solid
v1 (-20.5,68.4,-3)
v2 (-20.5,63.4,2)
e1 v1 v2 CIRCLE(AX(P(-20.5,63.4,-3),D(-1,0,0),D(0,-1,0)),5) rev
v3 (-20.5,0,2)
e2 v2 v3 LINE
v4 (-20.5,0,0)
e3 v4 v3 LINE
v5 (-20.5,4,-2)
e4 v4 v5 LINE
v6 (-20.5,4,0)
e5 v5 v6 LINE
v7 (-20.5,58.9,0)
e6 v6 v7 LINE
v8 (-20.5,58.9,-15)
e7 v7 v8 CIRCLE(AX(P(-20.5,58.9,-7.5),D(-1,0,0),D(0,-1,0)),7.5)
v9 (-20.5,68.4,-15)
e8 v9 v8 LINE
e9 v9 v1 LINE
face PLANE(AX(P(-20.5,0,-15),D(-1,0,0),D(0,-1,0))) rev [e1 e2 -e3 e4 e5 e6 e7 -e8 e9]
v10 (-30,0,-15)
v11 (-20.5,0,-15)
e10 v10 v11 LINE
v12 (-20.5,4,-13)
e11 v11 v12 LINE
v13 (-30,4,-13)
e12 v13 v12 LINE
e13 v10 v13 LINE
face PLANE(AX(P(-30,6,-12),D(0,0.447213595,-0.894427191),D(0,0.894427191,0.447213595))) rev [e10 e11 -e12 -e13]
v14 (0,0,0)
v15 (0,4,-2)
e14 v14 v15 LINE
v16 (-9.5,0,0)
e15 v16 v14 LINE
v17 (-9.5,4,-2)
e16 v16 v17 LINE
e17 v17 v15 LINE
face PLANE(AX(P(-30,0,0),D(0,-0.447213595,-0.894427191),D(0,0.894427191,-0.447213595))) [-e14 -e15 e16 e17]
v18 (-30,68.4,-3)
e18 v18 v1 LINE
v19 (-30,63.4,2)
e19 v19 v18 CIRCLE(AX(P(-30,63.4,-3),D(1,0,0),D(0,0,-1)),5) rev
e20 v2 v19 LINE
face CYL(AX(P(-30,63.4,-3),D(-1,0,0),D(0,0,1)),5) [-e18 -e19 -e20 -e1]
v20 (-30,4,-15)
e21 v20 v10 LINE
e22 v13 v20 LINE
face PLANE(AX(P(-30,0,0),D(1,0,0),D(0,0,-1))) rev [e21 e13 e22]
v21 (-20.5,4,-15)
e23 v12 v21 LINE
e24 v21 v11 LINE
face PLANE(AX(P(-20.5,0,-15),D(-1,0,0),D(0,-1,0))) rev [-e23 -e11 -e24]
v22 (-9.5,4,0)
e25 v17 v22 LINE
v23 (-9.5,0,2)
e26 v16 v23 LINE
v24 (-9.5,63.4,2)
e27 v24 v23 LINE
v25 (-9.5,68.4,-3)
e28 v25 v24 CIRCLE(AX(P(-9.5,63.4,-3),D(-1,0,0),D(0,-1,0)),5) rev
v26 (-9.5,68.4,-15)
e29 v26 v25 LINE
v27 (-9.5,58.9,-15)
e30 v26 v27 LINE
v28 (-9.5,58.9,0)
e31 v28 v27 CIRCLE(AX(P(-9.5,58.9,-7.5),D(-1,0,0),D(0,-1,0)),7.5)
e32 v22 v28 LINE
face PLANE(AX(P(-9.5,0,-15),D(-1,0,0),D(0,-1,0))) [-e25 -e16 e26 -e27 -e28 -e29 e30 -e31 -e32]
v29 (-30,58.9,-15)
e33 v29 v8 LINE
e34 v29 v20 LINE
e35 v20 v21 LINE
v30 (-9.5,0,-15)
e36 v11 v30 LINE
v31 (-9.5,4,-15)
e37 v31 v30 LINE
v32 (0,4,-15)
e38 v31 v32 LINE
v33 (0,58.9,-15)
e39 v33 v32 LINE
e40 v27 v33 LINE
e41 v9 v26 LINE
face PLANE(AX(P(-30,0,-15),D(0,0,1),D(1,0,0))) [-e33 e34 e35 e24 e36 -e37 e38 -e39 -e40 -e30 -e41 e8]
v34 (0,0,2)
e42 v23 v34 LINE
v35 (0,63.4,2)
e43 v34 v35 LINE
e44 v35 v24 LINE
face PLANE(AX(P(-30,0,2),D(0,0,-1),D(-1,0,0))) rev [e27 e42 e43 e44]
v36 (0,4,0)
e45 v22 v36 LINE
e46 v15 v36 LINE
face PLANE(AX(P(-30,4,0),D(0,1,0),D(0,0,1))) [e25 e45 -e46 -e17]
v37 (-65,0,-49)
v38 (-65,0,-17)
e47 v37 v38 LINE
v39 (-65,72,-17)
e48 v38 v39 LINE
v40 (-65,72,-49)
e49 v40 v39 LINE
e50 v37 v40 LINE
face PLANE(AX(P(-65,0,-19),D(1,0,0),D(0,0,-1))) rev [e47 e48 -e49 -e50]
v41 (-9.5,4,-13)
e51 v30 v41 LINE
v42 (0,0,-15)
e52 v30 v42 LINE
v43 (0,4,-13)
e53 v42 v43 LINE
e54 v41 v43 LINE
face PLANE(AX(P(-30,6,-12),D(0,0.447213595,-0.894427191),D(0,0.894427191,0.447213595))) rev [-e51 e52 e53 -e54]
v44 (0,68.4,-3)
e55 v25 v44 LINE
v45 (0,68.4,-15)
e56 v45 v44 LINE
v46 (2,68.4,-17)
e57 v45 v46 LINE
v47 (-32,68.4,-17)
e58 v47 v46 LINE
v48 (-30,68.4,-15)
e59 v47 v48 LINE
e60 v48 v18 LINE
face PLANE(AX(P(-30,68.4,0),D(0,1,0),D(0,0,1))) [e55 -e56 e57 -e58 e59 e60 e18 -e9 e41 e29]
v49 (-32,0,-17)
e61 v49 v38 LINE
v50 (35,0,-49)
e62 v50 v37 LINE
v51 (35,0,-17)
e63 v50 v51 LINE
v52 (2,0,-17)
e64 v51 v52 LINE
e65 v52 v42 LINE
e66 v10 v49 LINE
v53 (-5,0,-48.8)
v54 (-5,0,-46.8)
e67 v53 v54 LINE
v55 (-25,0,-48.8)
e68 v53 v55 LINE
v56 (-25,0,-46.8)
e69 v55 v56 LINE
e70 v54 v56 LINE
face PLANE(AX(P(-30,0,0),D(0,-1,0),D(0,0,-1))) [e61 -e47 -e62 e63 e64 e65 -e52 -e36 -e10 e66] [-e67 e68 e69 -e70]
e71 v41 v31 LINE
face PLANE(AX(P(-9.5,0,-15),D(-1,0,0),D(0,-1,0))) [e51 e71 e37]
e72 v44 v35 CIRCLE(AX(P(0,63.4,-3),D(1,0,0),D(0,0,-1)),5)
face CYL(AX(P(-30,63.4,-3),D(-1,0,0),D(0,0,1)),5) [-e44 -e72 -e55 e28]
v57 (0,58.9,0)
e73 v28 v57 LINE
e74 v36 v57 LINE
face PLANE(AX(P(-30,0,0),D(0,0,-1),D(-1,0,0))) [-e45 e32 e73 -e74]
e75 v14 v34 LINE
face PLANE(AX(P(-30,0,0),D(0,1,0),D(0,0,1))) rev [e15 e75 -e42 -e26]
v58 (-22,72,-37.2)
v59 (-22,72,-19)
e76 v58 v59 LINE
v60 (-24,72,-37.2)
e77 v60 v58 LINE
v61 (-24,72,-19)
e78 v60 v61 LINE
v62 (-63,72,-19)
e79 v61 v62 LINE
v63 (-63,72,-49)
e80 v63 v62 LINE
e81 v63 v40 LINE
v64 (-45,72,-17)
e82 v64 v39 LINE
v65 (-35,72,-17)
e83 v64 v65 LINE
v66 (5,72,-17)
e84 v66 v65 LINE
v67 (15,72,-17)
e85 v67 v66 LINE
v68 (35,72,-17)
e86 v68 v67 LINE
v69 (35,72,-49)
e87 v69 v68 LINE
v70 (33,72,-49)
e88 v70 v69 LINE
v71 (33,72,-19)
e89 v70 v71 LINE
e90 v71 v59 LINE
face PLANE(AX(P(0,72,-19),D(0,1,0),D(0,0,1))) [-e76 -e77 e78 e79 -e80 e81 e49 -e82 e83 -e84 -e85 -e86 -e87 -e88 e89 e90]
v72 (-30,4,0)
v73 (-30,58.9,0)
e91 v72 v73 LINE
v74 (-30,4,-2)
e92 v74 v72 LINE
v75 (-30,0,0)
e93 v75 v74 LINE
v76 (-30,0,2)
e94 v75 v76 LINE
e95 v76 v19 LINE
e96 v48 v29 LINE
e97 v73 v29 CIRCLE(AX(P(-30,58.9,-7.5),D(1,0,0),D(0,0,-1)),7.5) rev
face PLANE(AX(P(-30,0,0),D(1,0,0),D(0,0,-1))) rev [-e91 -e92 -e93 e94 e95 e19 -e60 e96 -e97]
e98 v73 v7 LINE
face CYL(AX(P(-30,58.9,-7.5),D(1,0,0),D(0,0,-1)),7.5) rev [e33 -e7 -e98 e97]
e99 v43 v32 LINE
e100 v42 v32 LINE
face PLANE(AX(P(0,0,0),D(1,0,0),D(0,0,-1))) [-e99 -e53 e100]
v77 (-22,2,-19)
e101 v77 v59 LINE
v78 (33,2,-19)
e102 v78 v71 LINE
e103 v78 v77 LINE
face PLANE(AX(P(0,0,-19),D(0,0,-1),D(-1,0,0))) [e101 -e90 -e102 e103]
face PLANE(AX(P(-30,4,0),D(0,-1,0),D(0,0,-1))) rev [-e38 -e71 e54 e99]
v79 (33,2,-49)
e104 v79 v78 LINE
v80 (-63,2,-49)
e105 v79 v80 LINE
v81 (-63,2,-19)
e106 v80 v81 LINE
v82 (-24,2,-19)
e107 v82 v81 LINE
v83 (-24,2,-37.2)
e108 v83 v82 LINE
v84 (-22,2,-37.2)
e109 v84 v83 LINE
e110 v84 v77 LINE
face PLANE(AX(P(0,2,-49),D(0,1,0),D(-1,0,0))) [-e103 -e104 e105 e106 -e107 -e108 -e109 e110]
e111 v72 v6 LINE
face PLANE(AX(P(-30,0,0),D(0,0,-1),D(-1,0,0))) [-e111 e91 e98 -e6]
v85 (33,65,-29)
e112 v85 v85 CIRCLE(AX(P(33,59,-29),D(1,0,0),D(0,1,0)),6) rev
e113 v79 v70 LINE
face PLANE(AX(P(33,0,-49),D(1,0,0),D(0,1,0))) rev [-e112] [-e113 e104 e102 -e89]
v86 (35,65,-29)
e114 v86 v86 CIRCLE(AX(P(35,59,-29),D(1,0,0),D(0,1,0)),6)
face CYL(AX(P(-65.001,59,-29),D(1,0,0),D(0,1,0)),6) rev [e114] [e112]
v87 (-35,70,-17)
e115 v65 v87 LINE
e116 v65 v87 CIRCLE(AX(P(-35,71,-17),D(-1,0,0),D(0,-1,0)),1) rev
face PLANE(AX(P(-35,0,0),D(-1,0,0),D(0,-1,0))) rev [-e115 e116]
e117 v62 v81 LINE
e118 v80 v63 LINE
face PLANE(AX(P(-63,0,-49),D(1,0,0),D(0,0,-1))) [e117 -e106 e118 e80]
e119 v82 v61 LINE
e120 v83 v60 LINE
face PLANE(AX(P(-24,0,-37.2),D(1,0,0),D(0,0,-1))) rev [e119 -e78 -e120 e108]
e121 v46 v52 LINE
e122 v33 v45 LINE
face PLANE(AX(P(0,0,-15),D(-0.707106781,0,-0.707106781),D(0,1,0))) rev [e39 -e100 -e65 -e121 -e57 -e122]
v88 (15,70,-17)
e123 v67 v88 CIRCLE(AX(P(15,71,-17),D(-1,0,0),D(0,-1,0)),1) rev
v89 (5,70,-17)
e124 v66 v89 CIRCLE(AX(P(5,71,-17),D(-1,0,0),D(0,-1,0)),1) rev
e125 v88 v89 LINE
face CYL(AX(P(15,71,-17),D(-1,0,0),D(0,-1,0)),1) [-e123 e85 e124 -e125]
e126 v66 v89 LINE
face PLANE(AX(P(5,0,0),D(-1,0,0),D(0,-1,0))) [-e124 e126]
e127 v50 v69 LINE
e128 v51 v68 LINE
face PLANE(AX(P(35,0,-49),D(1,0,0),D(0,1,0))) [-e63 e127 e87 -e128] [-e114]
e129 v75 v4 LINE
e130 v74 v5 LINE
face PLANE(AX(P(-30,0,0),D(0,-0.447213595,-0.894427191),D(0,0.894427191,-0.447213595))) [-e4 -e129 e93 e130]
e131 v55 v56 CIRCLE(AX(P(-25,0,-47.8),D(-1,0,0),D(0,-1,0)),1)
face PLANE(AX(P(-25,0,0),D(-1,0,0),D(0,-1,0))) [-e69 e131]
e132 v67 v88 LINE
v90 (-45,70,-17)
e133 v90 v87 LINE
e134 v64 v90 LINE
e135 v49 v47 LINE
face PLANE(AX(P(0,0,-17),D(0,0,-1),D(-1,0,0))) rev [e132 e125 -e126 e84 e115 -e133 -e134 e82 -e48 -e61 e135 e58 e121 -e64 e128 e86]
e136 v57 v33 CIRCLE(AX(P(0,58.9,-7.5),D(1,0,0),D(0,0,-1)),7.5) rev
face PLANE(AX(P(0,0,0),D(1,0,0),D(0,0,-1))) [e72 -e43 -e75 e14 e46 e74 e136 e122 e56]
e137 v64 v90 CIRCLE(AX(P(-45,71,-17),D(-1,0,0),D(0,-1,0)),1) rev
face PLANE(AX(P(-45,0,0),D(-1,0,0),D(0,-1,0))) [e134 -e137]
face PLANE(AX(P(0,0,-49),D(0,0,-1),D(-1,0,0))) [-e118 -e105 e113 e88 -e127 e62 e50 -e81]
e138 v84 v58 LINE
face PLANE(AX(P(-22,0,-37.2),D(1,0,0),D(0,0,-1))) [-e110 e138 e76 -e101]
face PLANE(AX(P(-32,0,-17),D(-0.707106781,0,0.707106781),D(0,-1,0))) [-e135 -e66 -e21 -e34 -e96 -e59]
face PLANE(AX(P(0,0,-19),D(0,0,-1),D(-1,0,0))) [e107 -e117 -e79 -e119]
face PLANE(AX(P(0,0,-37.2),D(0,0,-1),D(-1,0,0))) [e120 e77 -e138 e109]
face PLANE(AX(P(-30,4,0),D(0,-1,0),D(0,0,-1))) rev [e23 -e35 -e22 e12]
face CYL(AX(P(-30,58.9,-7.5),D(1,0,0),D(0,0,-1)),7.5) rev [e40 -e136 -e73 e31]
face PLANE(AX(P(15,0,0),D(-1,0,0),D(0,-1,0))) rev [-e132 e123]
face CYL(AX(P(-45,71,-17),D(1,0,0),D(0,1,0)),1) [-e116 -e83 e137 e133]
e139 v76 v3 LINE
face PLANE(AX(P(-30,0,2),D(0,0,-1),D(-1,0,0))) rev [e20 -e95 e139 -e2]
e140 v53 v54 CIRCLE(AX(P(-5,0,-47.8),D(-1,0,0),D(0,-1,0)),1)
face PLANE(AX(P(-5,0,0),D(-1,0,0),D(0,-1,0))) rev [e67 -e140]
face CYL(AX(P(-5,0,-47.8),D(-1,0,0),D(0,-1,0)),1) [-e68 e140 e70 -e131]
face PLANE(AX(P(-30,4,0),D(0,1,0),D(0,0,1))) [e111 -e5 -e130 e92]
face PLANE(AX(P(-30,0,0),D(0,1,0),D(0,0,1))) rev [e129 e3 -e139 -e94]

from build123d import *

# Parameters (mm, degrees)
BOSS_EXTRUDE1_DEPTH      = 30
FILLET1_R                = 5
SKETCH2_W                = 11
SKETCH2_H                = 68.4
CUT_EXTRUDE1_DEPTH       = 17
BOSS_EXTRUDE3_DEPTH      = 2
BOSS_EXTRUDE4_DEPTH      = 32
SKETCH4_W                = 2
SKETCH4_H                = 70
BOSS_EXTRUDE5_DEPTH      = 18.2
BOSS_EXTRUDE6_DEPTH      = 10
BOSS_EXTRUDE6_DEPTH_BACK = 10
BOSS_EXTRUDE7_START      = 20
BOSS_EXTRUDE7_DEPTH      = 10
BOSS_EXTRUDE8_START      = -30
BOSS_EXTRUDE8_DEPTH      = 10
CHAMFER1_SIZE            = 2
CUT_EXTRUDE2_REACH       = 134.608
SKETCH6_R                = 6


with BuildPart() as part:
    # Sketch1 → Boss-Extrude1 (new body)
    with BuildSketch(Plane(origin=(0, 0, 0), x_dir=(0, 0, -1), z_dir=(1, 0, 0))):
        with BuildLine():
            ThreePointArc((-2, 58.9), (7.5, 68.4), (17, 58.9))
            Line((17, 58.9), (17, 0))
            Line((17, 0), (15, 0))
            Line((15, 0), (15, 58.9))
            ThreePointArc((15, 58.9), (7.5, 66.4), (0, 58.9))
            Line((0, 58.9), (0, 0))
            Line((0, 0), (-2, 0))
            Line((-2, 0), (-2, 58.9))
        make_face()
        with BuildLine():
            Line((-2, 0), (0, 0))
            Line((0, 0), (0, 4))
            Line((0, 4), (0, 58.9))
            ThreePointArc((0, 58.9), (2.196699141, 64.203300859), (7.5, 66.4))
            Line((7.5, 66.4), (7.5, 68.4))
            ThreePointArc((7.5, 68.4), (0.782485579, 65.617514421), (-2, 58.9))
            Line((-2, 58.9), (-2, 0))
        make_face()
        Polygon((0, 4), (0, 0), (2, 4), align=None)
        Polygon((15, 0), (15, 4), (13, 4), align=None)
        with BuildLine():
            Line((17, 68.4), (7.5, 68.4))
            ThreePointArc((7.5, 68.4), (14.217514421, 65.617514421), (17, 58.9))
            Line((17, 58.9), (17, 68.4))
        make_face()
        with BuildLine():
            Line((-2, 68.4), (-2, 58.9))
            ThreePointArc((-2, 58.9), (0.782485579, 65.617514421), (7.5, 68.4))
            Line((7.5, 68.4), (-2, 68.4))
        make_face()
    extrude(amount=-BOSS_EXTRUDE1_DEPTH)

    # Fillet1
    fillet1_edges = [part.edges().sort_by_distance(p)[0] for p in [
        (-15, 68.4, 2),
    ]]
    fillet(fillet1_edges, radius=FILLET1_R)

    # Sketch2 → Cut-Extrude1 (cut)
    with BuildSketch(Plane.XY.offset(2)):
        with Locations((-15, 34.2)):
            Rectangle(SKETCH2_W, SKETCH2_H)
    extrude(amount=-CUT_EXTRUDE1_DEPTH, mode=Mode.SUBTRACT)

    # Sketch3 → Boss-Extrude3 (add)
    with BuildSketch(Plane(origin=(0, 0, -17), x_dir=(-1, 0, 0), z_dir=(0, 0, -1))):
        Polygon((-33, 2), (0, 2), (0, 0), (65, 0), (65, 72), (-33, 72), align=None)
    extrude(amount=BOSS_EXTRUDE3_DEPTH)

    # Sketch3<3> → Boss-Extrude4 (add)
    with BuildSketch(Plane(origin=(0, 0, -17), x_dir=(-1, 0, 0), z_dir=(0, 0, -1))):
        Polygon((65, 72), (63, 72), (63, 2), (-33, 2), (-33, 72), (-35, 72), (-35, 0), (65, 0), align=None)
    extrude(amount=BOSS_EXTRUDE4_DEPTH)

    # Sketch4 → Boss-Extrude5 (add)
    with BuildSketch(Plane(origin=(0, 0, -19), x_dir=(-1, 0, 0), z_dir=(0, 0, -1))):
        with Locations((23, 37)):
            Rectangle(SKETCH4_W, SKETCH4_H)
    extrude(amount=BOSS_EXTRUDE5_DEPTH)

    # Sketch5 → Boss-Extrude6 (add, two sides: drawn at the far end of the back side and taken through both)
    with BuildSketch(Plane.ZY.offset(15).offset(-BOSS_EXTRUDE6_DEPTH_BACK)):
        with BuildLine():
            Line((-48.8, 0), (-46.8, 0))
            ThreePointArc((-46.8, 0), (-47.8, -1), (-48.8, 0))
        make_face()
    extrude(amount=BOSS_EXTRUDE6_DEPTH + BOSS_EXTRUDE6_DEPTH_BACK)

    # Sketch5<3> → Boss-Extrude7 (add)
    with BuildSketch(Plane.ZY.offset(15).offset(BOSS_EXTRUDE7_START)):
        with BuildLine():
            ThreePointArc((-17, 72), (-16, 71), (-17, 70))
            Line((-17, 70), (-17, 72))
        make_face()
    extrude(amount=BOSS_EXTRUDE7_DEPTH)

    # Sketch5<4> → Boss-Extrude8 (add)
    with BuildSketch(Plane.ZY.offset(15).offset(BOSS_EXTRUDE8_START)):
        with BuildLine():
            ThreePointArc((-17, 72), (-16, 71), (-17, 70))
            Line((-17, 70), (-17, 72))
        make_face()
    extrude(amount=BOSS_EXTRUDE8_DEPTH)

    # Chamfer1
    chamfer1_edges = [part.edges().sort_by_distance(p)[0] for p in [
        (-30, 34.2, -17),
        (0, 34.2, -17),
    ]]
    chamfer(chamfer1_edges, length=CHAMFER1_SIZE - 0.0001)  # a hair under: the kernel refuses the full size

    # Sketch6 → Cut-Extrude2 (cut, up to next)
    with BuildSketch(Plane(origin=(35, 0, 0), x_dir=(0, 0, -1), z_dir=(1, 0, 0)), mode=Mode.PRIVATE) as cut_extrude2_sk1:
        with Locations(Location((29, 59, 0), (0, 0, 90))):
            Circle(SKETCH6_R)
    cut_extrude2_tool1 = extrude(cut_extrude2_sk1.sketch, amount=-CUT_EXTRUDE2_REACH, mode=Mode.PRIVATE) & part.part
    add(cut_extrude2_tool1.solids().sort_by_distance((35, 59, -29))[0], mode=Mode.SUBTRACT)


solid = part.part
